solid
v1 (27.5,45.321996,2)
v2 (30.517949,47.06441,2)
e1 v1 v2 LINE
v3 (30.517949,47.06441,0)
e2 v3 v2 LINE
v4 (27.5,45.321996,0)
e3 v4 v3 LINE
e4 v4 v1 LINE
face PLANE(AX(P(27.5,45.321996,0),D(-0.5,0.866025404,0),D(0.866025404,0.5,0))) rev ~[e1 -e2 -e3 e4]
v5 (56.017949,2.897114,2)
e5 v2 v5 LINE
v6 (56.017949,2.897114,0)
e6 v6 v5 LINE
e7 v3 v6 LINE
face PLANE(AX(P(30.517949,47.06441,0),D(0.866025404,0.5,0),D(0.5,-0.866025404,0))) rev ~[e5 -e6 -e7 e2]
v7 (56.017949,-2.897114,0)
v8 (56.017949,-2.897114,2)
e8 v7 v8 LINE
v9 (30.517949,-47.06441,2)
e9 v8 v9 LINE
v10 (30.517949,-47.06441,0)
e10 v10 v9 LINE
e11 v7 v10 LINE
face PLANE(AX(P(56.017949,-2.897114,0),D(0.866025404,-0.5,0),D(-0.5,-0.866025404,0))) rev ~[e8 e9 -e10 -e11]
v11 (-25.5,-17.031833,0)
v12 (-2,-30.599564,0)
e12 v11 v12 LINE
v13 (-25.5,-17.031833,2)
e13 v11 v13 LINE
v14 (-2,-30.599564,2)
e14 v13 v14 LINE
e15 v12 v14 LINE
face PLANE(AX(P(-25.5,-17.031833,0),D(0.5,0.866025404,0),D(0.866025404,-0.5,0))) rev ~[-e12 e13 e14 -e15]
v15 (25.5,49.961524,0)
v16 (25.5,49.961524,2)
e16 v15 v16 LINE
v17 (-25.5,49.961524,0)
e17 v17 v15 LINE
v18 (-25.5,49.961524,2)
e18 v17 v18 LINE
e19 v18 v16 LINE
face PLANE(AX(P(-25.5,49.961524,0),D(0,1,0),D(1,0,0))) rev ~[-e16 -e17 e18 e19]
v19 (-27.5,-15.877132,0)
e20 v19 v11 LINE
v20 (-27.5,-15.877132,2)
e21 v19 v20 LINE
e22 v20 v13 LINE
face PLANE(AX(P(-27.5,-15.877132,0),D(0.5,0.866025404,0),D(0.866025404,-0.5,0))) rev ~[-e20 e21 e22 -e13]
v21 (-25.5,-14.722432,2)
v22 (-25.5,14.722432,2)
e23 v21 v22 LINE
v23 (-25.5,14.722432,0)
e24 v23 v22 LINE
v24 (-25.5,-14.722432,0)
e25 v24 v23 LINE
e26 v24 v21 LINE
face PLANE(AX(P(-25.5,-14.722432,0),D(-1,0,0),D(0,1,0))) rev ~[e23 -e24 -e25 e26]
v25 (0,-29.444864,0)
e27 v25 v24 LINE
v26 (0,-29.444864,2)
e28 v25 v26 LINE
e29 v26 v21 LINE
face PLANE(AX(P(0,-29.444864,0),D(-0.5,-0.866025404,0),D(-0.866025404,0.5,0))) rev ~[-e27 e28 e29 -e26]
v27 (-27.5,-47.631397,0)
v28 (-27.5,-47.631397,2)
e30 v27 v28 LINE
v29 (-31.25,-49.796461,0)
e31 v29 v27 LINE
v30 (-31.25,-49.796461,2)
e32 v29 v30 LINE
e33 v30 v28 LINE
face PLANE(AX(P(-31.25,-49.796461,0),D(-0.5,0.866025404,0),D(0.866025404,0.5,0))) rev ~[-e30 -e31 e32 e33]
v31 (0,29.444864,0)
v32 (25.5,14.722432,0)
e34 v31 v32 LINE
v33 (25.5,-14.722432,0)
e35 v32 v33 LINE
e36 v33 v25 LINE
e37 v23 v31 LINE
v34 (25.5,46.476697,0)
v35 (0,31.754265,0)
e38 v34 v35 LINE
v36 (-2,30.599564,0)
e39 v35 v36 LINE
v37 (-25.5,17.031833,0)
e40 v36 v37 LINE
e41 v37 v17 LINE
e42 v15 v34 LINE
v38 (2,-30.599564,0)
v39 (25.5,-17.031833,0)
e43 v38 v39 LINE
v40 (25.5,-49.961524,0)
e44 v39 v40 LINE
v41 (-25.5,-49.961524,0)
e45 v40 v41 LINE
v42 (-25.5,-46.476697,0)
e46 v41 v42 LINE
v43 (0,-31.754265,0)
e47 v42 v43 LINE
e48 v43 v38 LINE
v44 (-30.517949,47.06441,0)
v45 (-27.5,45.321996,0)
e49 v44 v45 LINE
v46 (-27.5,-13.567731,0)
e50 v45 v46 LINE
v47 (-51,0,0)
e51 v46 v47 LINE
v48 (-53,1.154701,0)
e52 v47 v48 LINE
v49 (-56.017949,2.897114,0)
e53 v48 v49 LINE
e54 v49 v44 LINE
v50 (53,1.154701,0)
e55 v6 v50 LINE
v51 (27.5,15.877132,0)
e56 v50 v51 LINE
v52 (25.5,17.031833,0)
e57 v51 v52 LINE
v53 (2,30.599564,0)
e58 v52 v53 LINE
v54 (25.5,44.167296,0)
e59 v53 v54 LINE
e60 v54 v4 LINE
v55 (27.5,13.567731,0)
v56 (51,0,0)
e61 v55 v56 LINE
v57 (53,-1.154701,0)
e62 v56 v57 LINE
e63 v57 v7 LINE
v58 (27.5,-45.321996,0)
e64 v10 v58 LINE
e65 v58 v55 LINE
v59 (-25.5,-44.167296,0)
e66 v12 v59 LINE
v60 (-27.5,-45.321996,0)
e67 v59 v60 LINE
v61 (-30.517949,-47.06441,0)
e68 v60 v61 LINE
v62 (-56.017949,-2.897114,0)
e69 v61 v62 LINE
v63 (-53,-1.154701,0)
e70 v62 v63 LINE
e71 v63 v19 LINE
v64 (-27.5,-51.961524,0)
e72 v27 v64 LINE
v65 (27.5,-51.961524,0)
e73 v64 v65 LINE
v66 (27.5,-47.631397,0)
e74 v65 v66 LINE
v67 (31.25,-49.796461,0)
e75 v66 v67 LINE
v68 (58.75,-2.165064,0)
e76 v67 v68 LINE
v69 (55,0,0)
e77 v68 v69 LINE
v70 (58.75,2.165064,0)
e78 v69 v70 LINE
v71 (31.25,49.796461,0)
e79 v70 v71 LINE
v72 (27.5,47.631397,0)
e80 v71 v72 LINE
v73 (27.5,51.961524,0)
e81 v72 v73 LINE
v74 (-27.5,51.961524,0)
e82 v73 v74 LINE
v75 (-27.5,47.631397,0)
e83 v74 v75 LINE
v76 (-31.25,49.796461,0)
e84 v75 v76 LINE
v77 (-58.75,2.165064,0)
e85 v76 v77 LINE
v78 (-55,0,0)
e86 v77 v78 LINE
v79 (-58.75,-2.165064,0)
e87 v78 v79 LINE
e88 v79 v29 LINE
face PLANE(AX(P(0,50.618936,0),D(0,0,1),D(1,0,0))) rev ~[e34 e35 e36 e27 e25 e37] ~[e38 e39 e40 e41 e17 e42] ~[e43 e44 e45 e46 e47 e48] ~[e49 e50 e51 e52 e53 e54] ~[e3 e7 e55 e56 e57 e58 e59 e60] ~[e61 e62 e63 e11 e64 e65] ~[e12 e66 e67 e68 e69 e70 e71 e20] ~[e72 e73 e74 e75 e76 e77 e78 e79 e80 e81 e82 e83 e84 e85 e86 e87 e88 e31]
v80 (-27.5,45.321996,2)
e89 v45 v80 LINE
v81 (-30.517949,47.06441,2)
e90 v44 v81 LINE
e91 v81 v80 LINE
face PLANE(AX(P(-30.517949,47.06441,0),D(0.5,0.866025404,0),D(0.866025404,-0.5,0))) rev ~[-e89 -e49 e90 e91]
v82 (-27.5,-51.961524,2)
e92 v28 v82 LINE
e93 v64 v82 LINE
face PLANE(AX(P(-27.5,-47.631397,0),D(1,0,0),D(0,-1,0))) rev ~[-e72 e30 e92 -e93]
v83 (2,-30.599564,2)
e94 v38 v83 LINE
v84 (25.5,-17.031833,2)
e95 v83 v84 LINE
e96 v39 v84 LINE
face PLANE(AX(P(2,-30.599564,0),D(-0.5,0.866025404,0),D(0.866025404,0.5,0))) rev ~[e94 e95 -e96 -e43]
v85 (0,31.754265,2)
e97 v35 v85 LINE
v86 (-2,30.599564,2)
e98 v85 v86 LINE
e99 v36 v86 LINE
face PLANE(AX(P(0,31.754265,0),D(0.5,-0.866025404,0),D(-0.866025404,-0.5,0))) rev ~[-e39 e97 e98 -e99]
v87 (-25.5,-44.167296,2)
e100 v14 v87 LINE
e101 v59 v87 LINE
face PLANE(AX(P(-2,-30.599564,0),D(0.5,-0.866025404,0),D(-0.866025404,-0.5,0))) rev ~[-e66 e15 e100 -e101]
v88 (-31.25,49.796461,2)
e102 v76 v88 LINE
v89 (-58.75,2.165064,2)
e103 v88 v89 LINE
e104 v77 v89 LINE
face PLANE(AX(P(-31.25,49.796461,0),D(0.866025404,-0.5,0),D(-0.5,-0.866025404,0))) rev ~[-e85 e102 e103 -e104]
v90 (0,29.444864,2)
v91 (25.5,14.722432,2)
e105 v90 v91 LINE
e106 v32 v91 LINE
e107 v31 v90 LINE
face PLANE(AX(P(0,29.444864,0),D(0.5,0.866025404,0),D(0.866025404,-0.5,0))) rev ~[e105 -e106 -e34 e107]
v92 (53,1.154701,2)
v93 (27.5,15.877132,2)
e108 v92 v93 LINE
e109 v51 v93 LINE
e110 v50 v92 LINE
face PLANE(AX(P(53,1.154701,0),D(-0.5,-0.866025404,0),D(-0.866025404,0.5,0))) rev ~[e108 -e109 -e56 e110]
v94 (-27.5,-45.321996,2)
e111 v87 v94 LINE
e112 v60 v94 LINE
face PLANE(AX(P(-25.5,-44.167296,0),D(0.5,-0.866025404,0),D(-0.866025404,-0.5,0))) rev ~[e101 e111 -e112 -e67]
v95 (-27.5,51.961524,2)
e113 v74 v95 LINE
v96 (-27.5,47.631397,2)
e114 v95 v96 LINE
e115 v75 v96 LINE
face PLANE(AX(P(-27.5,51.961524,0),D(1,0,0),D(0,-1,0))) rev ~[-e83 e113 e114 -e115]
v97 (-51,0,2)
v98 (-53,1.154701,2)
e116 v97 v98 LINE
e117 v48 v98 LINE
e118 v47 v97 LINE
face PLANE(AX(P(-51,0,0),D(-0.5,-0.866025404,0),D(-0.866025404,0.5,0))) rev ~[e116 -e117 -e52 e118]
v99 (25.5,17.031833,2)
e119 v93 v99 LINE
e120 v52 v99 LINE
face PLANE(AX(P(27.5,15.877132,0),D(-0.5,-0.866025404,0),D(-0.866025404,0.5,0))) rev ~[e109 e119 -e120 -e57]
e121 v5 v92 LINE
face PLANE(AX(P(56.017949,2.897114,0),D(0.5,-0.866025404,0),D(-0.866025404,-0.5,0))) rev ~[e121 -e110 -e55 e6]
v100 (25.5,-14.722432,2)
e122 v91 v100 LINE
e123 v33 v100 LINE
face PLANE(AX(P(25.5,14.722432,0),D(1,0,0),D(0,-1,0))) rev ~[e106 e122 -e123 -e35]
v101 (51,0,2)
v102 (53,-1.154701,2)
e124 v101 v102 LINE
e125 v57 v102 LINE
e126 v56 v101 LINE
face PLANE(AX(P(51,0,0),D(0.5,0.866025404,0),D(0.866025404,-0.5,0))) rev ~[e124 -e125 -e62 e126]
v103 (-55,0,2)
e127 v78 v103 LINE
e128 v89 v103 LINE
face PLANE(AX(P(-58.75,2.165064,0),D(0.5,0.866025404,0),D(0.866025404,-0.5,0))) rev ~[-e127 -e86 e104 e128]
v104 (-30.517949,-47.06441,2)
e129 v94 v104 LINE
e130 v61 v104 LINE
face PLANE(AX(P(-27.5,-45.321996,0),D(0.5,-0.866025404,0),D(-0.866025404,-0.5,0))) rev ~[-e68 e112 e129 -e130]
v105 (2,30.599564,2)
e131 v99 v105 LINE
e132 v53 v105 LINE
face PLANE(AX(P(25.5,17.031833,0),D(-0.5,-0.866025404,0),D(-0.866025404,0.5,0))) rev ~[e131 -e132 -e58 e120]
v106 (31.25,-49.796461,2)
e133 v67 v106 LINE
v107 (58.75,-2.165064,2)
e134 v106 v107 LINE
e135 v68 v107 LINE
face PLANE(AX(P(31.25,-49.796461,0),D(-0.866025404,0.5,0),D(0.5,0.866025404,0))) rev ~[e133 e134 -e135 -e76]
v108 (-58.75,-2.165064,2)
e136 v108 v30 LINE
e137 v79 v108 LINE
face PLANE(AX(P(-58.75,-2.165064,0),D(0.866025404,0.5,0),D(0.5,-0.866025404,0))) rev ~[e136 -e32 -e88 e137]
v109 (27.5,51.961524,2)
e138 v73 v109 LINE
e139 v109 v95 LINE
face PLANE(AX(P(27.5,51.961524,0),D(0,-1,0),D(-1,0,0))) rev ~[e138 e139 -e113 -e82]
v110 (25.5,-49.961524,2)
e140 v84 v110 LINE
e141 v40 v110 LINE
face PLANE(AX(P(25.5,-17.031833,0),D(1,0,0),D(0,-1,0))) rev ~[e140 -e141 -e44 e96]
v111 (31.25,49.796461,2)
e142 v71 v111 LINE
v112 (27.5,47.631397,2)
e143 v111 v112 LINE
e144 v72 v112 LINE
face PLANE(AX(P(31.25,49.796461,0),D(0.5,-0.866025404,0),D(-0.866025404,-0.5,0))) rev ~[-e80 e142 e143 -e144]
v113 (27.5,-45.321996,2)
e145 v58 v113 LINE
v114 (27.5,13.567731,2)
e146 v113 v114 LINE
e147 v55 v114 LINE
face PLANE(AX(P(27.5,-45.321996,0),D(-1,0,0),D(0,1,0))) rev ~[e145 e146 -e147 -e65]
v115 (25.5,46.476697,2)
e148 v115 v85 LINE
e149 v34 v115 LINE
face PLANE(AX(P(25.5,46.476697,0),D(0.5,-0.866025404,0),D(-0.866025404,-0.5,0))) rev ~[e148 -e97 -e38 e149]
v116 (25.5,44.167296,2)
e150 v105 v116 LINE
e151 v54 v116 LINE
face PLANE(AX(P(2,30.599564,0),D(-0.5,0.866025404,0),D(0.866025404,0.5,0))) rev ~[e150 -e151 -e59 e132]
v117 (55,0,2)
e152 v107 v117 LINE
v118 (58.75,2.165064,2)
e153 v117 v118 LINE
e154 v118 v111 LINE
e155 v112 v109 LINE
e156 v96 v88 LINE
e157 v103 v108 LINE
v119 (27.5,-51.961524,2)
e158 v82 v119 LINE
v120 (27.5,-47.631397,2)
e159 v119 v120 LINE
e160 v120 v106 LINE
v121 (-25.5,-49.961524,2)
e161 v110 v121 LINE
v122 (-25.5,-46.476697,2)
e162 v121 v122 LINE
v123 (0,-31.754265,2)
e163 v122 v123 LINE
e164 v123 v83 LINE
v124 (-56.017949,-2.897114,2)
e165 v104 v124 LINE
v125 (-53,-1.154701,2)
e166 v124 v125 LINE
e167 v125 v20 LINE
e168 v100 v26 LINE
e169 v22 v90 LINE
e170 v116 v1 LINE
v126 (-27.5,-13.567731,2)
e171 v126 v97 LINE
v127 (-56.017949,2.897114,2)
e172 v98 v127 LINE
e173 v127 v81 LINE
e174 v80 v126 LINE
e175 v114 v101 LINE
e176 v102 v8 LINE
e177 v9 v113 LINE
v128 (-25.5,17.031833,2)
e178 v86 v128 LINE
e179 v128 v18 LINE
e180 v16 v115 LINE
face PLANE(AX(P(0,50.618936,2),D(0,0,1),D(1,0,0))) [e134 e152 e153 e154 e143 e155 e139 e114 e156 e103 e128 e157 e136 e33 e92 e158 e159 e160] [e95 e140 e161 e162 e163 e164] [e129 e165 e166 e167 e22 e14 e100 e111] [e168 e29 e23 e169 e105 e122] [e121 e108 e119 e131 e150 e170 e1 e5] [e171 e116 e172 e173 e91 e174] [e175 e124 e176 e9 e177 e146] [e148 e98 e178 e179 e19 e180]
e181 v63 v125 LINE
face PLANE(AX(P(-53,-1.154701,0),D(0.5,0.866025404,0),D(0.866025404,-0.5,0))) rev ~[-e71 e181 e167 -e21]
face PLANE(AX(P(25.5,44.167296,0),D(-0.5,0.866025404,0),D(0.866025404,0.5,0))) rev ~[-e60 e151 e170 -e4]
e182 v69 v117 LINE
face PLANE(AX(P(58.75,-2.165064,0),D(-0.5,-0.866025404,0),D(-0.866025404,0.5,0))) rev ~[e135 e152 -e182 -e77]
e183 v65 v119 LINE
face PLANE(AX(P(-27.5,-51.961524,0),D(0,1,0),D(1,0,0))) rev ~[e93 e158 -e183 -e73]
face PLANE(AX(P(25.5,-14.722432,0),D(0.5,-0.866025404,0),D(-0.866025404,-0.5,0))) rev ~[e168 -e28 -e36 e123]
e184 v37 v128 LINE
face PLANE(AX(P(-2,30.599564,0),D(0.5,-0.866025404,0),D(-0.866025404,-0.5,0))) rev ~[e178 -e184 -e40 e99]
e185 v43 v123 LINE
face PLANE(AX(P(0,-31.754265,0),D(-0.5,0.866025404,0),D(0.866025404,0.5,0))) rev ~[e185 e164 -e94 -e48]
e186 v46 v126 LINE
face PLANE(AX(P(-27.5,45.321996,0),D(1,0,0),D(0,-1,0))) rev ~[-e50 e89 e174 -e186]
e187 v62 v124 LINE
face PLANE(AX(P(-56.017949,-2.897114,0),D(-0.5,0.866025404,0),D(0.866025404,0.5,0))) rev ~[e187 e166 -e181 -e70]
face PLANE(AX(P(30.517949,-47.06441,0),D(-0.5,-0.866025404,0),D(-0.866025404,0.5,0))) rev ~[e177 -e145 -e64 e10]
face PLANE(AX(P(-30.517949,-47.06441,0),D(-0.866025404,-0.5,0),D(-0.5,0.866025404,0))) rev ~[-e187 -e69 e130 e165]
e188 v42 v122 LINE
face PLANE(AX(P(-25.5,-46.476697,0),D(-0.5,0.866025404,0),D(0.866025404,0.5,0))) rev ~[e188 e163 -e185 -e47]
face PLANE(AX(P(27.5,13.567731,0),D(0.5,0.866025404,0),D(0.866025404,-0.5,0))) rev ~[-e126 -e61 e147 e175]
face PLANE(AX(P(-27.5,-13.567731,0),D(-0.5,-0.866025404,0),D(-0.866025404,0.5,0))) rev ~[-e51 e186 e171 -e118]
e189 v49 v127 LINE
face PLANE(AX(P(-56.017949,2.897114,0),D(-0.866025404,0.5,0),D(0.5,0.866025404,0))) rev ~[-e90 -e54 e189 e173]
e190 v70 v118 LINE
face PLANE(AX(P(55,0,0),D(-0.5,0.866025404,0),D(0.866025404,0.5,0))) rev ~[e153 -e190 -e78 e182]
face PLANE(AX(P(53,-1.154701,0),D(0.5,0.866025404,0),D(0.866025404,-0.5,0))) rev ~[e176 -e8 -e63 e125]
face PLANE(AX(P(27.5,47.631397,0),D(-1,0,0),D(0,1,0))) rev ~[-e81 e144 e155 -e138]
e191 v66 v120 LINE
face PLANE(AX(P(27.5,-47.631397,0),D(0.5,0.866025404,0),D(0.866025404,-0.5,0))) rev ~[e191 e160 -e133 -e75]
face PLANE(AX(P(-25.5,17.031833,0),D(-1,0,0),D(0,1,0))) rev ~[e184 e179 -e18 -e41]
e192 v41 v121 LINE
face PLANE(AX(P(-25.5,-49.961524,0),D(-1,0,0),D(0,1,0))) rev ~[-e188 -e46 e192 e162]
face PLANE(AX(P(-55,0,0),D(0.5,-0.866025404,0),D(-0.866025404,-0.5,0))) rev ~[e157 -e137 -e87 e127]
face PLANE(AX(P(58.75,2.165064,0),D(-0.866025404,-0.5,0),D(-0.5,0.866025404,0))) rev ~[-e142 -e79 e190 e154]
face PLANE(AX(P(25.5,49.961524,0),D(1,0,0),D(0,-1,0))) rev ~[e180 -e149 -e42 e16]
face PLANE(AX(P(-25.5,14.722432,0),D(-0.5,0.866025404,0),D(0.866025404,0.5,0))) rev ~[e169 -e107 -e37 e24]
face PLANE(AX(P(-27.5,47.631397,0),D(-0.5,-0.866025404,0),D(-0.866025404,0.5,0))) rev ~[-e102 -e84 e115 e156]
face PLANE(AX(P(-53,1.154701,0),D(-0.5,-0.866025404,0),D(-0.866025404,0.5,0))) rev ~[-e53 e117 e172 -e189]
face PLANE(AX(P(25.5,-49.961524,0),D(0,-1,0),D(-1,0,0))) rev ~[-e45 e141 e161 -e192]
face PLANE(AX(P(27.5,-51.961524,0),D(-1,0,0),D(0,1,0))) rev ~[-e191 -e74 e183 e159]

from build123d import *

# Parameters (mm, degrees)
F1_DEPTH = 2


# Not quite as in the source:
# - a feature names something its author has since deleted; it is built from what else it names


with BuildPart() as f1:
    # F0 (on Top) → F1 (new body)
    with BuildSketch(Plane.XY):
        Polygon((27.5, 51.9615242271), (-27.5, 51.9615242271), (-27.5, 47.6313972081), (-25.5, 46.4766966698), (-25.5, 49.9615242271), (25.5, 49.9615242271), (25.5, 46.4766966698), (27.5, 47.6313972081), align=None)
        Polygon((-25.5, 46.4766966698), (-27.5, 47.6313972081), (-27.5, 45.3219961314), (-25.5, 44.167295593), align=None)
        Polygon((-27.5, 45.3219961314), (-27.5, 47.6313972081), (-31.25, 49.7964607176), (-58.75, 2.1650635095), (-55, 0), (-53, 1.1547005384), (-56.0179491924, 2.897114317), (-30.5179491924, 47.06440991), align=None)
        Polygon((31.25, 49.7964607176), (27.5, 47.6313972081), (27.5, 45.3219961314), (30.5179491924, 47.06440991), (56.0179491924, 2.897114317), (53, 1.1547005384), (55, 0), (58.75, 2.1650635095), align=None)
        Polygon((27.5, 45.3219961314), (27.5, 47.6313972081), (25.5, 46.4766966698), (25.5, 44.167295593), align=None)
        Polygon((-25.5, 44.167295593), (-27.5, 45.3219961314), (-27.5, 15.8771324027), (-25.5, 17.0318329411), align=None)
        Polygon((25.5, 44.167295593), (25.5, 46.4766966698), (0, 31.7542648054), (2, 30.5995642671), align=None)
        Polygon((-25.5, 17.0318329411), (-27.5, 15.8771324027), (-27.5, 13.567731326), (-25.5, 14.7224318643), align=None)
        Polygon((2, 30.5995642671), (0, 31.7542648054), (-2, 30.5995642671), (0, 29.4448637287), align=None)
        Polygon((-25.5, 14.7224318643), (-27.5, 13.567731326), (-27.5, -13.567731326), (-25.5, -14.7224318643), align=None)
        Polygon((-2, 30.5995642671), (-25.5, 17.0318329411), (-25.5, 14.7224318643), (0, 29.4448637287), align=None)
        Polygon((-53, -1.1547005384), (-55, 0), (-58.75, -2.1650635095), (-31.25, -49.7964607176), (-27.5, -47.6313972081), (-27.5, -45.3219961314), (-30.5179491924, -47.06440991), (-56.0179491924, -2.897114317), align=None)
        Polygon((-53, 1.1547005384), (-55, 0), (-53, -1.1547005384), (-51, 0), align=None)
        Polygon((25.5, 17.0318329411), (2, 30.5995642671), (0, 29.4448637287), (25.5, 14.7224318643), align=None)
        Polygon((53, -1.1547005384), (55, 0), (53, 1.1547005384), (51, 0), align=None)
        Polygon((58.75, -2.1650635095), (55, 0), (53, -1.1547005384), (56.0179491924, -2.897114317), (30.5179491924, -47.06440991), (27.5, -45.3219961314), (27.5, -47.6313972081), (31.25, -49.7964607176), align=None)
        Polygon((-25.5, -14.7224318643), (-27.5, -13.567731326), (-27.5, -15.8771324027), (-25.5, -17.0318329411), align=None)
        Polygon((-27.5, -15.8771324027), (-27.5, -13.567731326), (-51, 0), (-53, -1.1547005384), align=None)
        Polygon((27.5, 15.8771324027), (25.5, 17.0318329411), (25.5, 14.7224318643), (27.5, 13.567731326), align=None)
        Polygon((51, 0), (53, 1.1547005384), (27.5, 15.8771324027), (27.5, 13.567731326), align=None)
        Polygon((0, -29.4448637287), (-25.5, -14.7224318643), (-25.5, -17.0318329411), (-2, -30.5995642671), align=None)
        Polygon((27.5, 13.567731326), (25.5, 14.7224318643), (25.5, -14.7224318643), (27.5, -13.567731326), align=None)
        Polygon((2, -30.5995642671), (0, -29.4448637287), (-2, -30.5995642671), (0, -31.7542648054), align=None)
        Polygon((25.5, -14.7224318643), (0, -29.4448637287), (2, -30.5995642671), (25.5, -17.0318329411), align=None)
        Polygon((-27.5, -45.3219961314), (-27.5, -47.6313972081), (-25.5, -46.4766966698), (-25.5, -44.167295593), align=None)
        Polygon((-25.5, -46.4766966698), (-27.5, -47.6313972081), (-27.5, -51.9615242271), (27.5, -51.9615242271), (27.5, -47.6313972081), (25.5, -46.4766966698), (25.5, -49.9615242271), (-25.5, -49.9615242271), align=None)
        Polygon((27.5, -13.567731326), (25.5, -14.7224318643), (25.5, -17.0318329411), (27.5, -15.8771324027), align=None)
        Polygon((25.5, -46.4766966698), (27.5, -47.6313972081), (27.5, -45.3219961314), (25.5, -44.167295593), align=None)
        Polygon((0, -31.7542648054), (-2, -30.5995642671), (-25.5, -44.167295593), (-25.5, -46.4766966698), align=None)
        Polygon((27.5, -15.8771324027), (25.5, -17.0318329411), (25.5, -44.167295593), (27.5, -45.3219961314), align=None)
    extrude(amount=F1_DEPTH)


solid = f1.part
